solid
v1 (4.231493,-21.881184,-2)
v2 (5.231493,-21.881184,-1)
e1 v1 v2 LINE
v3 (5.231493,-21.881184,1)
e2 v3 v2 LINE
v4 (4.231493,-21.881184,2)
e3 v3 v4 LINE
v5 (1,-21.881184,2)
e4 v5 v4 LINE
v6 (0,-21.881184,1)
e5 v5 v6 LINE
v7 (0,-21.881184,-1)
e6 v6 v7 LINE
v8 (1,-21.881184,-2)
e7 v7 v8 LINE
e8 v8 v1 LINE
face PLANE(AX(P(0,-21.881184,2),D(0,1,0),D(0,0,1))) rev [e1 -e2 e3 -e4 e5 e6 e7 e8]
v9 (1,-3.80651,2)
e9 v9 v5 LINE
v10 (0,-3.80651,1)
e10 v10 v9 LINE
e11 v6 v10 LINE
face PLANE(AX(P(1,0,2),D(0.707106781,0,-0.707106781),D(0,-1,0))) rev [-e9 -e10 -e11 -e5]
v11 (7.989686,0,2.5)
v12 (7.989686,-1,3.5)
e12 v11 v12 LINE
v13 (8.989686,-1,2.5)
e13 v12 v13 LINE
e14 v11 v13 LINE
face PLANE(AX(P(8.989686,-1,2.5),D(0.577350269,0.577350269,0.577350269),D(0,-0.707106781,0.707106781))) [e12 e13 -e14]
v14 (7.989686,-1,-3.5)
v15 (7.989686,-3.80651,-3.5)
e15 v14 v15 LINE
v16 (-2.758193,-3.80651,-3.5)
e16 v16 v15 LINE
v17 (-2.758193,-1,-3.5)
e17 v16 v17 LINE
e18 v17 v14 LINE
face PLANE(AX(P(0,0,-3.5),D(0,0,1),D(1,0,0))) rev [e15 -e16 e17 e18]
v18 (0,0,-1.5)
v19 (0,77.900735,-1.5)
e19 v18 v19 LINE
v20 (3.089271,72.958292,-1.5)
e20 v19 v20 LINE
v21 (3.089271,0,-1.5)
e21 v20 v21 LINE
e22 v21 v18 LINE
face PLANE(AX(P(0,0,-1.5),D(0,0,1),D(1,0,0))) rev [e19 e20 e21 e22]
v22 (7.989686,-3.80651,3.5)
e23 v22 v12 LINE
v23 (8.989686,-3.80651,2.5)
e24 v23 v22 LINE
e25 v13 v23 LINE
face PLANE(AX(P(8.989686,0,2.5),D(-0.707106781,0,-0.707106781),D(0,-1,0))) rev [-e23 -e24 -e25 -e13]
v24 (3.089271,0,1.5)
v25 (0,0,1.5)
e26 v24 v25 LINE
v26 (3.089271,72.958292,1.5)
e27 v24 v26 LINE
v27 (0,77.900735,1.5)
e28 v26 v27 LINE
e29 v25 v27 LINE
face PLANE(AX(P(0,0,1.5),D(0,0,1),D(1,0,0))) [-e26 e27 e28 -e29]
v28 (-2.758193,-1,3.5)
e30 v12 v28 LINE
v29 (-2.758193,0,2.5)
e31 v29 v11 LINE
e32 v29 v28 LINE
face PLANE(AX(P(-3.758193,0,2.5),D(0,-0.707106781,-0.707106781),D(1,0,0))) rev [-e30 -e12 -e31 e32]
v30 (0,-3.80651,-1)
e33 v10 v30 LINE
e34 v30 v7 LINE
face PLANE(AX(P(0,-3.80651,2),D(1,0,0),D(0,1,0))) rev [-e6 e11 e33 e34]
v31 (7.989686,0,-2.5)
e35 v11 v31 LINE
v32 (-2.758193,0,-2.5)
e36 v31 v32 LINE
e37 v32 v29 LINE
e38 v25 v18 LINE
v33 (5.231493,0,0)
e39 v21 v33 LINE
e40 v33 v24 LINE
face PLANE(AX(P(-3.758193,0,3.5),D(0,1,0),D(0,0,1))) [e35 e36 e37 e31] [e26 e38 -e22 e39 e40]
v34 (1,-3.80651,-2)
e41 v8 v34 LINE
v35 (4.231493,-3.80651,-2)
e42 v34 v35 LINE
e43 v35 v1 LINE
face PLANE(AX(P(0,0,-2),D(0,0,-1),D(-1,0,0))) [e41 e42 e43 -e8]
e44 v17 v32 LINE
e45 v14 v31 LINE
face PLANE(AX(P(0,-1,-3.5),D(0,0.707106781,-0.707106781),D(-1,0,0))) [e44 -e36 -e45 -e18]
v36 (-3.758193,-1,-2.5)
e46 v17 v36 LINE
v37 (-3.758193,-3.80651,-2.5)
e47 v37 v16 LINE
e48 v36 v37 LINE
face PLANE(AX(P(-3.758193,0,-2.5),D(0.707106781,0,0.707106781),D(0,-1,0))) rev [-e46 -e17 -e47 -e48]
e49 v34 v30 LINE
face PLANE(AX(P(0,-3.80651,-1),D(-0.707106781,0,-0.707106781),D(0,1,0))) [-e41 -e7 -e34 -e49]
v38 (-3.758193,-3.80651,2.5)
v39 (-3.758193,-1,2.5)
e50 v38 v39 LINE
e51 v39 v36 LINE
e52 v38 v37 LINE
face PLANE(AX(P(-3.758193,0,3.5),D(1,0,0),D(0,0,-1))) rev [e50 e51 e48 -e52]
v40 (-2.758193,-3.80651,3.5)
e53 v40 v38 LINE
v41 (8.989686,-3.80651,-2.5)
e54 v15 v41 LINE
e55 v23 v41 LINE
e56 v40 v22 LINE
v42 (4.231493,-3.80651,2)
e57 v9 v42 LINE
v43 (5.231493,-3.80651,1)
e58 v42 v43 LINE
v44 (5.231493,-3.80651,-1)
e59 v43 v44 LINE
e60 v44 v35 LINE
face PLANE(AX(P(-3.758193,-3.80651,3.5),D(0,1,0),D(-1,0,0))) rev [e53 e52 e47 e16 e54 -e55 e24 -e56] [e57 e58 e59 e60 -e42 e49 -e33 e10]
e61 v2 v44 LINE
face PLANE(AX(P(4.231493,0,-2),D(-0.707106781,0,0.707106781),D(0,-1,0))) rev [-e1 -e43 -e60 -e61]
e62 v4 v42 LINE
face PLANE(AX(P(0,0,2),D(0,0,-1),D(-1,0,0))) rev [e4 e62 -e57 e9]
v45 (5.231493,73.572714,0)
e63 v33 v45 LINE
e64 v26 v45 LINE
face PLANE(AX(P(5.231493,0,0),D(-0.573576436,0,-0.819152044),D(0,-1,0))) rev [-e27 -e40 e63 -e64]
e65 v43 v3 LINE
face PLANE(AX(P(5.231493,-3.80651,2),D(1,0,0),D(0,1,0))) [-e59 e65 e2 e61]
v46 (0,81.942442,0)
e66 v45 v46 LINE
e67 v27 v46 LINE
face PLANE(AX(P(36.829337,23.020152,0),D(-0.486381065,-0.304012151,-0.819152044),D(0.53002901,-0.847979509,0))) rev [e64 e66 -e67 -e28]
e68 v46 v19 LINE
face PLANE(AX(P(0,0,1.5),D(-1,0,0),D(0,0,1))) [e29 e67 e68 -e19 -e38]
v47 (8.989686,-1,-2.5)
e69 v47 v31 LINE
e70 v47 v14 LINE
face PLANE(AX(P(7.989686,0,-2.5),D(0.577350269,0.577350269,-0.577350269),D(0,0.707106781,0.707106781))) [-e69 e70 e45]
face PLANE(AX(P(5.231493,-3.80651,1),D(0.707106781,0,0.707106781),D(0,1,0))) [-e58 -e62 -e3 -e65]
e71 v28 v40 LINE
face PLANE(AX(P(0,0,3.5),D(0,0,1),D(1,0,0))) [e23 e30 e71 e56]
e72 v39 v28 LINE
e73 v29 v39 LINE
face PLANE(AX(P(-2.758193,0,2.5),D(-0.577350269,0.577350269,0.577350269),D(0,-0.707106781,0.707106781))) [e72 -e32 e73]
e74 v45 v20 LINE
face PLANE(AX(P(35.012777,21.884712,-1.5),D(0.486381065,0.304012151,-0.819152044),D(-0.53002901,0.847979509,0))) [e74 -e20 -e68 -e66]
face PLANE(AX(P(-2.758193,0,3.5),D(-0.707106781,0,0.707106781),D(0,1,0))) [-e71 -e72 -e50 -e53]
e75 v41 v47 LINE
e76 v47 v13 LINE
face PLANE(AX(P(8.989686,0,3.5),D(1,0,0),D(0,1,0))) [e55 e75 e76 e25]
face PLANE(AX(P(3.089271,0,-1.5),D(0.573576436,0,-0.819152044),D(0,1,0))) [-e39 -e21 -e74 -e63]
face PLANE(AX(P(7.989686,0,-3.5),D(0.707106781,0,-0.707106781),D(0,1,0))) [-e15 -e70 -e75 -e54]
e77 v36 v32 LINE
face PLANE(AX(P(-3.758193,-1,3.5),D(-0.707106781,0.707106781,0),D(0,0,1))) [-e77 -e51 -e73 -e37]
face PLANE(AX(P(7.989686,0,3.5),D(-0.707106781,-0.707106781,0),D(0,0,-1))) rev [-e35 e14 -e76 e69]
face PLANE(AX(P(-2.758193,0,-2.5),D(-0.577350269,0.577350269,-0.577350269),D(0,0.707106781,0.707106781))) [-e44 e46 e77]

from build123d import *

# Parameters (mm, degrees)
BOSS_EXTRUDE1_DEPTH = 1.5
SKETCH1_3_W         = 5.23149294
SKETCH1_3_H         = 18.074674524
BOSS_EXTRUDE2_DEPTH = 2
SKETCH1_4_W         = 12.747878717
SKETCH1_4_H         = 3.806509515
BOSS_EXTRUDE3_DEPTH = 3.5
CHAMFER1_SIZE       = 1
CHAMFER2_SIZE       = 2.14222201
CHAMFER2_SIZE_2     = 1.5


with BuildPart() as part:
    # Sketch1 → Boss-Extrude1 (new, symmetric)
    with BuildSketch(Plane.XY):
        Polygon((0, 81.942442457), (0, 0), (5.23149294, 0), (5.23149294, 73.572714139), align=None)
    extrude(amount=BOSS_EXTRUDE1_DEPTH, both=True)



with BuildPart() as body_2:
    # Sketch1<3> → Boss-Extrude2 (new, symmetric)
    with BuildSketch(Plane.XY):
        with Locations((2.61574647, -12.843846777)):
            Rectangle(SKETCH1_3_W, SKETCH1_3_H)
    extrude(amount=BOSS_EXTRUDE2_DEPTH, both=True)


with BuildPart() as part_1:
    add(part.part)

    add(body_2.part)  # Boss-Extrude3 merges body 2
    # Sketch1<4> → Boss-Extrude3 (add, symmetric)
    with BuildSketch(Plane.XY):
        with Locations((2.615746471, -1.903254758)):
            Rectangle(SKETCH1_4_W, SKETCH1_4_H)
    extrude(amount=BOSS_EXTRUDE3_DEPTH, both=True)

    # Chamfer1
    chamfer1_edges = [part_1.edges().sort_by_distance(p)[0] for p in [
        (2.61574647, 0, 3.5),
        (8.989685829, 0, 0),
        (-3.758192888, -1.903254757, -3.5),
        (-3.758192888, 0, 0),
        (8.989685829, -1.903254757, 3.5),
        (-3.758192888, -1.903254757, 3.5),
        (2.61574647, 0, -3.5),
        (8.989685829, -1.903254757, -3.5),
        (0, -12.843846777, -2),
        (5.23149294, -12.843846777, 2),
        (0, -12.843846777, 2),
        (5.23149294, -12.843846777, -2),
    ]]
    chamfer(chamfer1_edges, length=CHAMFER1_SIZE)

    # Chamfer2
    # the kernel refuses this chamfer: 2.14222201, 1.5 mm, written as the material it takes off along each edge
    with BuildSketch(Plane(origin=(5.23149294, 0, 1.5), x_dir=(-0.99975333476413, 0, 0.022209674198456916), z_dir=(0, 1, 0))) as chamfer2_piece_1:
        Polygon((CHAMFER2_SIZE * 0.999753334817, -CHAMFER2_SIZE * 0.0222096741996), (-CHAMFER2_SIZE_2 * 0.0222096741985, -CHAMFER2_SIZE_2 * 0.999753334764), (0, 0), align=None)
    extrude(amount=79.105114369, mode=Mode.SUBTRACT)
    with BuildSketch(Plane(origin=(5.23149294, 0, -1.5), x_dir=(-0.99975333476413, 0, -0.022209674198456916), z_dir=(0, 1, 0))) as chamfer2_piece_2:
        Polygon((CHAMFER2_SIZE * 0.999753334817, CHAMFER2_SIZE * 0.0222096741996), (-CHAMFER2_SIZE_2 * 0.0222096741985, CHAMFER2_SIZE_2 * 0.999753334764), (0, 0), align=None)
    extrude(amount=79.105114369, mode=Mode.SUBTRACT)
    with BuildSketch(Plane(origin=(8.163825559, 68.881352106, 1.5), x_dir=(-0.8477703422928946, -0.5298982705204714, 0.02220967419845706), z_dir=(-0.530029010251303, 0.8479795093585836, 0))) as chamfer2_piece_3:
        Polygon((CHAMFER2_SIZE * 0.999753334817, -CHAMFER2_SIZE * 0.0222096741996), (-CHAMFER2_SIZE_2 * 0.0222096741985, -CHAMFER2_SIZE_2 * 0.999753334764), (0, 0), align=None)
    extrude(amount=20.935001598, mode=Mode.SUBTRACT)
    with BuildSketch(Plane(origin=(8.163825559, 68.881352106, -1.5), x_dir=(-0.8477703422928946, -0.5298982705204714, -0.02220967419845706), z_dir=(-0.530029010251303, 0.8479795093585836, 0))) as chamfer2_piece_4:
        Polygon((CHAMFER2_SIZE * 0.999753334817, CHAMFER2_SIZE * 0.0222096741996), (-CHAMFER2_SIZE_2 * 0.0222096741985, CHAMFER2_SIZE_2 * 0.999753334764), (0, 0), align=None)
    extrude(amount=20.935001598, mode=Mode.SUBTRACT)


solid = part_1.part
